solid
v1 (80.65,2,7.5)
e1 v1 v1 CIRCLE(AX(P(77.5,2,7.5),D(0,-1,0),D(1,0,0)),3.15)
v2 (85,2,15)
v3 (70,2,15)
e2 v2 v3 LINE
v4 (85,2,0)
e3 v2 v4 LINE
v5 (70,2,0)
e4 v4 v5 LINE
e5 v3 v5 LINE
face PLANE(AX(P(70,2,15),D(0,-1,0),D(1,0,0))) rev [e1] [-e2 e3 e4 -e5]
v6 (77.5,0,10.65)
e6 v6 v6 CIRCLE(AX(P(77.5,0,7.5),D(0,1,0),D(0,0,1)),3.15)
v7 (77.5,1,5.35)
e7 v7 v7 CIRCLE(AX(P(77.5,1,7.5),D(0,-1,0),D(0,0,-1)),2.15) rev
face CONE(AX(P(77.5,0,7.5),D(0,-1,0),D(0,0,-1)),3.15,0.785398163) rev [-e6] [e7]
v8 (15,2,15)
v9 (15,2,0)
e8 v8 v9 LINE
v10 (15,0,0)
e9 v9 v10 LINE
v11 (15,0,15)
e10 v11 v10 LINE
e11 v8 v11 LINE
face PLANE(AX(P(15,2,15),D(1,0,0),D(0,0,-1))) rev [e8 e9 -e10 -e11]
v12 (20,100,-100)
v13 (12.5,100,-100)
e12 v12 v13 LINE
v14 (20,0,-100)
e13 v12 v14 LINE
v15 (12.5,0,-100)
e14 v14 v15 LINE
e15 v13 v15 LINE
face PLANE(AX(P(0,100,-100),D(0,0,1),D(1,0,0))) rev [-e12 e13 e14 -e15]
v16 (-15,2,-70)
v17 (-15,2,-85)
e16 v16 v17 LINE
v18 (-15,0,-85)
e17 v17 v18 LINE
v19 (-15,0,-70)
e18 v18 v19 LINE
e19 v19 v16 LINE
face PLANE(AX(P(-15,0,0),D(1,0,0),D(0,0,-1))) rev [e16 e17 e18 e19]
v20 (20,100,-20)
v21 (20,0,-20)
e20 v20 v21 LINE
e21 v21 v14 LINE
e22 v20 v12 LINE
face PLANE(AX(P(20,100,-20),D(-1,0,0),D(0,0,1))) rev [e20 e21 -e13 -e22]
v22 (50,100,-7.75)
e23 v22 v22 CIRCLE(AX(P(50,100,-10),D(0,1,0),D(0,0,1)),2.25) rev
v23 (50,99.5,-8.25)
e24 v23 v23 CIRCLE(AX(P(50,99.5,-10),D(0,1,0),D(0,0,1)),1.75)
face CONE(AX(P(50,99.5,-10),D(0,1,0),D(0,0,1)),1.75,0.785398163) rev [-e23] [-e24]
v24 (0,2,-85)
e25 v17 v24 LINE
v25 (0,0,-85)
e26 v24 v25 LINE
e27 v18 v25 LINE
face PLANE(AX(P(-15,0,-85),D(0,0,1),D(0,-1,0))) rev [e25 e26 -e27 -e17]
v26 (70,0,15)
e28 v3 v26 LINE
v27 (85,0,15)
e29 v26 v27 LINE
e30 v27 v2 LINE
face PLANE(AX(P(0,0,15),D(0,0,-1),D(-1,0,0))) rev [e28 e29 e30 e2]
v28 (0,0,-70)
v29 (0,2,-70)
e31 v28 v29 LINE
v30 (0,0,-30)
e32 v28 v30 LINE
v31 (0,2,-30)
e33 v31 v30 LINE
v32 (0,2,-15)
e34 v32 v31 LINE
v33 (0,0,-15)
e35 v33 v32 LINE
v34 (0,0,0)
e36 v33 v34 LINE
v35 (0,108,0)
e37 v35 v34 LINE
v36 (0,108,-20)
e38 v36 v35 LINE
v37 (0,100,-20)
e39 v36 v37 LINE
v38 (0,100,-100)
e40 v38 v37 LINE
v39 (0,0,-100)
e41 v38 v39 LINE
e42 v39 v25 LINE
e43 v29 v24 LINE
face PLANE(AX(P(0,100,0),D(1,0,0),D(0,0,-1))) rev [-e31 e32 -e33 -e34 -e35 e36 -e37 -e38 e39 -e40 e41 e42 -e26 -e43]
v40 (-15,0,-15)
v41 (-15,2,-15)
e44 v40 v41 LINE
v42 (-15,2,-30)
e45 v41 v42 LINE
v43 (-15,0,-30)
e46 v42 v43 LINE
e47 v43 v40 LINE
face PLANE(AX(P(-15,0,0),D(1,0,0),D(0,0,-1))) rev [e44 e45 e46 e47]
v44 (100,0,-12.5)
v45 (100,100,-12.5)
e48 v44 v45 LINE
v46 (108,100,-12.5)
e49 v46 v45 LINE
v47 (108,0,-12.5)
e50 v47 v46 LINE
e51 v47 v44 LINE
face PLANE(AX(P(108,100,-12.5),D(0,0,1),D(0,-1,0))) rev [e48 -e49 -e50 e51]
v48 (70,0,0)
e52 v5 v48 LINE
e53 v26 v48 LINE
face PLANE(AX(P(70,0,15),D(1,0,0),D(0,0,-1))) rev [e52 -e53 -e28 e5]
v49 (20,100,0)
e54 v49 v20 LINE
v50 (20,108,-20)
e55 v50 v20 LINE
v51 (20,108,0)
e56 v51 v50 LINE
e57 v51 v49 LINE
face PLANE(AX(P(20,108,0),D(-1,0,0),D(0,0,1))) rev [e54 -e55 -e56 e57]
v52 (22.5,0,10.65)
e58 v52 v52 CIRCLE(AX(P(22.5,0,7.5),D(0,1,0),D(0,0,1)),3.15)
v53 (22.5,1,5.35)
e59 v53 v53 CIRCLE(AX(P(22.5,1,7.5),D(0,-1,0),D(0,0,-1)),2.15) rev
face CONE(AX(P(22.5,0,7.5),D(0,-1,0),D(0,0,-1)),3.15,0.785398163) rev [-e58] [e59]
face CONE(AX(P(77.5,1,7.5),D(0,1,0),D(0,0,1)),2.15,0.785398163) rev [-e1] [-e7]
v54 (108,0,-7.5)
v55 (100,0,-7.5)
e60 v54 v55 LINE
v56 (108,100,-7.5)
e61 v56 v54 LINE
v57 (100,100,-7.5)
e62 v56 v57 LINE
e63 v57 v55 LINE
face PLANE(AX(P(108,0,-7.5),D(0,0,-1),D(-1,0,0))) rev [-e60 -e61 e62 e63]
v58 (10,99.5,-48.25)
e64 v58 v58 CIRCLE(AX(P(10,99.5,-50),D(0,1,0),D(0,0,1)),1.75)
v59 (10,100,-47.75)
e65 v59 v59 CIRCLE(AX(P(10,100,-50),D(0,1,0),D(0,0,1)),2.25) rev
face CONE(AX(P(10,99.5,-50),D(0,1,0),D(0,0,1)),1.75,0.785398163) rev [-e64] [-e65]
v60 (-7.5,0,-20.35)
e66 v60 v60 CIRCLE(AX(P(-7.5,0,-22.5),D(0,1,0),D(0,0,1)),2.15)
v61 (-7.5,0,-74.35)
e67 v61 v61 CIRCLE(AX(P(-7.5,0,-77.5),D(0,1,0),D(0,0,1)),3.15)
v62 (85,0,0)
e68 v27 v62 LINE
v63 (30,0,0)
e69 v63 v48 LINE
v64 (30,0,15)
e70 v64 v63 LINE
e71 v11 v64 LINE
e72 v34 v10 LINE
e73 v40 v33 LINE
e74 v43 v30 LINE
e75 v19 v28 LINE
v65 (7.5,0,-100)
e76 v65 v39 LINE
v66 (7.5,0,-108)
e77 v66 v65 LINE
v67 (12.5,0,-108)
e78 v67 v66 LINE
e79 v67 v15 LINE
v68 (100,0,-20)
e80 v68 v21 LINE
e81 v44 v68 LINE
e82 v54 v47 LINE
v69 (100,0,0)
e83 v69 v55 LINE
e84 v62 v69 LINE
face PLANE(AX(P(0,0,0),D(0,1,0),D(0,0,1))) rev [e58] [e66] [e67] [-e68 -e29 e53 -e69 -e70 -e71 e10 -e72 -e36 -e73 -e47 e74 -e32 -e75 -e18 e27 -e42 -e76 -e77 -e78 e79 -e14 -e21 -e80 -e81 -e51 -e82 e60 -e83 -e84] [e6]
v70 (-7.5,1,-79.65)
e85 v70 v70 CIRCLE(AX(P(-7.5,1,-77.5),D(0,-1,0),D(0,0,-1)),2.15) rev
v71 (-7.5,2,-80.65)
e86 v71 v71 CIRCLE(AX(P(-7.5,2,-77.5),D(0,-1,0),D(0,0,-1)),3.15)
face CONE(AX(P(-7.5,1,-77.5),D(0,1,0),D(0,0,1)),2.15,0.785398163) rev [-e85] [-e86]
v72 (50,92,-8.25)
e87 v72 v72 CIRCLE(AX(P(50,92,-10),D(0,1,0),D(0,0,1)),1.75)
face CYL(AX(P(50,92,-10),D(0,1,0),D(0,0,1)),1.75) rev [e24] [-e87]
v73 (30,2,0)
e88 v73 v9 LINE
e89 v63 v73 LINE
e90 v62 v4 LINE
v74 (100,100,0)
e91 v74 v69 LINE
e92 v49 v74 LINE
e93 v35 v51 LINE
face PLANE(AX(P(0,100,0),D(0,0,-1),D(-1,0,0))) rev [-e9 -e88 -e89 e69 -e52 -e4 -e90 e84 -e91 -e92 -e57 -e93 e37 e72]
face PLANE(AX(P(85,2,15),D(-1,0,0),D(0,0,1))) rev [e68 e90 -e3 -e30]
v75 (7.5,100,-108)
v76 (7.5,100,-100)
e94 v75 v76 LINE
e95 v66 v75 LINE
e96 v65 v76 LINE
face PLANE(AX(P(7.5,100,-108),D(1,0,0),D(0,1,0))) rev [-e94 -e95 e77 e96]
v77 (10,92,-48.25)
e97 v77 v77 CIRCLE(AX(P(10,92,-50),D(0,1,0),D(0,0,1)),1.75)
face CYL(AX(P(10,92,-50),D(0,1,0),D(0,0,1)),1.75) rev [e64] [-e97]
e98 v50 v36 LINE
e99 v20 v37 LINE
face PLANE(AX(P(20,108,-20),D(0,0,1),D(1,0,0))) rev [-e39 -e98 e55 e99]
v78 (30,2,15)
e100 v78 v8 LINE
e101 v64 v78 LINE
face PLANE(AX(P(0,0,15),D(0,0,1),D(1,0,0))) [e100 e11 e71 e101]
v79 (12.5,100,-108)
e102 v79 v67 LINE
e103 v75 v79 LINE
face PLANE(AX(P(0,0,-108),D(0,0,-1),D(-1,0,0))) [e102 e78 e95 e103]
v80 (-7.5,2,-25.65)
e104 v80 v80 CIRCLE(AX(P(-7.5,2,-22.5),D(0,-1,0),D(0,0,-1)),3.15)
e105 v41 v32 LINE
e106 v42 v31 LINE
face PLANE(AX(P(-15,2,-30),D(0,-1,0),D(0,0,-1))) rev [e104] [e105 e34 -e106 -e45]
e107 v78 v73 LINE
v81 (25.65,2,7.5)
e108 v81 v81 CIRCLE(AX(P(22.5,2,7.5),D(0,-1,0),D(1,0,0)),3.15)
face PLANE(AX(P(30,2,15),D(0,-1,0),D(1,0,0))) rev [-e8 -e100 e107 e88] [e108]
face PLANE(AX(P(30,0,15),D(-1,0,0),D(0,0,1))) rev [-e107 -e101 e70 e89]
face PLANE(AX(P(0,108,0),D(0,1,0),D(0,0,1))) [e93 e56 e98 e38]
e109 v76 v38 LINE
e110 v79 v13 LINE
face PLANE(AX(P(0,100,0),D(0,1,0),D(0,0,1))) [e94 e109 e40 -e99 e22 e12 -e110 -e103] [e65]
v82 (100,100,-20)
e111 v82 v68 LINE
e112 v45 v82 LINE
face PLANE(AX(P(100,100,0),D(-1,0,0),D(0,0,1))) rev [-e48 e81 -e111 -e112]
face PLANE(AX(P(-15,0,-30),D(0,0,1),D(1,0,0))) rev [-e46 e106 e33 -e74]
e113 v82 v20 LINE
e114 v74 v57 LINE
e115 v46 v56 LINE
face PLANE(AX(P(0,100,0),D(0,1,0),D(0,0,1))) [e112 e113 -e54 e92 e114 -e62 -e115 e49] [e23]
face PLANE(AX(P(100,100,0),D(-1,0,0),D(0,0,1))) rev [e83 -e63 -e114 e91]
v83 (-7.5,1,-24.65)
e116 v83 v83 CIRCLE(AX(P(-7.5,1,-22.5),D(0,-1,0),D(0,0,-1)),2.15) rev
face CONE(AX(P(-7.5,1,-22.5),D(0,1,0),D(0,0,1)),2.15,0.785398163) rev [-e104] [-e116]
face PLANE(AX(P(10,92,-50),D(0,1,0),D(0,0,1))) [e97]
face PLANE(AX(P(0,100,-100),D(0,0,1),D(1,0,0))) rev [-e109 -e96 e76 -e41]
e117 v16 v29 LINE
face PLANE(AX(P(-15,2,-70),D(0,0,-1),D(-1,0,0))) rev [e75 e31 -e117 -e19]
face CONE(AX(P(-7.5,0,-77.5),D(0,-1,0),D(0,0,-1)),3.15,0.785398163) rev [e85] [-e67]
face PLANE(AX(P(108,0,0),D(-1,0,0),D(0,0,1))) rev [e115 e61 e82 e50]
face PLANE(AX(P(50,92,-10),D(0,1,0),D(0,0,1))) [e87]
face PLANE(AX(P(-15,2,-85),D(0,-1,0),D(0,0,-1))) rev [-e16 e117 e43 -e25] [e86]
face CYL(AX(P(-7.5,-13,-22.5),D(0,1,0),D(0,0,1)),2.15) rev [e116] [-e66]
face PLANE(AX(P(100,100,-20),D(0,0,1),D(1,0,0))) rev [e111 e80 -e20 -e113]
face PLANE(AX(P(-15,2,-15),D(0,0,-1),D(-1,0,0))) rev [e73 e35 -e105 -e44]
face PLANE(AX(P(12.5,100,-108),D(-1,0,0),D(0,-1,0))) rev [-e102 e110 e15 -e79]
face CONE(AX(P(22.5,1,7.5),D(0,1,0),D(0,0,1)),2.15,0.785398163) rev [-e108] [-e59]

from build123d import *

# Parameters (mm, degrees)
BOSS_EXTRUDE1_DEPTH = 100
SKETCH3_W           = 20
SKETCH3_H           = 20
BOSS_EXTRUDE2_DEPTH = 8
SKETCH4_W           = 5
SKETCH4_H           = 100
BOSS_EXTRUDE3_DEPTH = 8
SKETCH5_W           = 5
SKETCH5_H           = 100
BOSS_EXTRUDE4_DEPTH = 8
SKETCH6_R           = 1.75
CUT_EXTRUDE1_DEPTH  = 8
CHAMFER1_SIZE       = 0.5
SKETCH7_W           = 15
SKETCH7_H           = 2
BOSS_EXTRUDE5_DEPTH = 15
SKETCH8_W           = 15
SKETCH8_H           = 2
BOSS_EXTRUDE6_DEPTH = 15
SKETCH9_R           = 2.15
CUT_EXTRUDE2_DEPTH  = 15
CHAMFER2_SIZE       = 1


with BuildPart() as part:
    # Sketch2 → Boss-Extrude1 (new body)
    with BuildSketch(Plane(origin=(0, 0, 0), x_dir=(1, 0, 0), z_dir=(0, 1, 0))):
        Polygon((0, 0), (0, 100), (20, 100), (20, 20), (100, 20), (100, 0), align=None)
    extrude(amount=BOSS_EXTRUDE1_DEPTH)

    # Sketch3 → Boss-Extrude2 (add)
    with BuildSketch(Plane(origin=(0, 100, 0), x_dir=(1, 0, 0), z_dir=(0, 1, 0))):
        with Locations((10, 10)):
            Rectangle(SKETCH3_W, SKETCH3_H)
    extrude(amount=BOSS_EXTRUDE2_DEPTH)

    # Sketch4 → Boss-Extrude3 (add)
    with BuildSketch(Plane(origin=(100, 0, 0), x_dir=(0, 0, -1), z_dir=(1, 0, 0))):
        with Locations((10, 50)):
            Rectangle(SKETCH4_W, SKETCH4_H)
    extrude(amount=BOSS_EXTRUDE3_DEPTH)

    # Sketch5 → Boss-Extrude4 (add)
    with BuildSketch(Plane(origin=(0, 0, -100), x_dir=(-1, 0, 0), z_dir=(0, 0, -1))):
        with Locations((-10, 50)):
            Rectangle(SKETCH5_W, SKETCH5_H)
    extrude(amount=BOSS_EXTRUDE4_DEPTH)

    # Sketch6 → Cut-Extrude1 (cut)
    with BuildSketch(Plane(origin=(0, 100, 0), x_dir=(1, 0, 0), z_dir=(0, 1, 0))):
        with Locations(Location((50, 10, 0), (0, 0, 270))):
            Circle(SKETCH6_R)
        with Locations(Location((10, 50, 0), (0, 0, 270))):
            Circle(SKETCH6_R)
    extrude(amount=-CUT_EXTRUDE1_DEPTH, mode=Mode.SUBTRACT)

    # Chamfer1
    chamfer1_edges = [part.edges().sort_by_distance(p)[0] for p in [
        (50, 100, -11.75),
        (10, 100, -51.75),
    ]]
    chamfer(chamfer1_edges, length=CHAMFER1_SIZE)

    # Sketch7 → Boss-Extrude5 (add)
    with BuildSketch(Plane.XY):
        with Locations((22.5, 1)):
            Rectangle(SKETCH7_W, SKETCH7_H)
        with Locations((77.5, 1)):
            Rectangle(SKETCH7_W, SKETCH7_H)
    extrude(amount=BOSS_EXTRUDE5_DEPTH)

    # Sketch8 → Boss-Extrude6 (add)
    with BuildSketch(Plane.ZY):
        with Locations((-77.5, 1)):
            Rectangle(SKETCH8_W, SKETCH8_H)
        with Locations((-22.5, 1)):
            Rectangle(SKETCH8_W, SKETCH8_H)
    extrude(amount=BOSS_EXTRUDE6_DEPTH)

    # Sketch9 → Cut-Extrude2 (cut)
    with BuildSketch(Plane(origin=(0, 2, 0), x_dir=(1, 0, 0), z_dir=(0, 1, 0))):
        with Locations(Location((-7.5, 77.5, 0), (0, 0, 270))):
            Circle(SKETCH9_R)
        with Locations(Location((-7.5, 22.5, 0), (0, 0, 270))):
            Circle(SKETCH9_R)
        with Locations(Location((22.5, -7.5, 0), (0, 0, 270))):
            Circle(SKETCH9_R)
        with Locations(Location((77.5, -7.5, 0), (0, 0, 270))):
            Circle(SKETCH9_R)
    extrude(amount=-CUT_EXTRUDE2_DEPTH, mode=Mode.SUBTRACT)

    # Chamfer2
    chamfer2_edges = [part.edges().sort_by_distance(p)[0] for p in [
        (-7.5, 0, -79.65),
        (-7.5, 2, -79.65),
        (-7.5, 2, -24.65),
        (22.5, 0, 5.35),
        (22.5, 2, 5.35),
        (77.5, 0, 5.35),
        (77.5, 2, 5.35),
    ]]
    chamfer(chamfer2_edges, length=CHAMFER2_SIZE - 0.0001)  # a hair under: the kernel refuses the full size


solid = part.part
